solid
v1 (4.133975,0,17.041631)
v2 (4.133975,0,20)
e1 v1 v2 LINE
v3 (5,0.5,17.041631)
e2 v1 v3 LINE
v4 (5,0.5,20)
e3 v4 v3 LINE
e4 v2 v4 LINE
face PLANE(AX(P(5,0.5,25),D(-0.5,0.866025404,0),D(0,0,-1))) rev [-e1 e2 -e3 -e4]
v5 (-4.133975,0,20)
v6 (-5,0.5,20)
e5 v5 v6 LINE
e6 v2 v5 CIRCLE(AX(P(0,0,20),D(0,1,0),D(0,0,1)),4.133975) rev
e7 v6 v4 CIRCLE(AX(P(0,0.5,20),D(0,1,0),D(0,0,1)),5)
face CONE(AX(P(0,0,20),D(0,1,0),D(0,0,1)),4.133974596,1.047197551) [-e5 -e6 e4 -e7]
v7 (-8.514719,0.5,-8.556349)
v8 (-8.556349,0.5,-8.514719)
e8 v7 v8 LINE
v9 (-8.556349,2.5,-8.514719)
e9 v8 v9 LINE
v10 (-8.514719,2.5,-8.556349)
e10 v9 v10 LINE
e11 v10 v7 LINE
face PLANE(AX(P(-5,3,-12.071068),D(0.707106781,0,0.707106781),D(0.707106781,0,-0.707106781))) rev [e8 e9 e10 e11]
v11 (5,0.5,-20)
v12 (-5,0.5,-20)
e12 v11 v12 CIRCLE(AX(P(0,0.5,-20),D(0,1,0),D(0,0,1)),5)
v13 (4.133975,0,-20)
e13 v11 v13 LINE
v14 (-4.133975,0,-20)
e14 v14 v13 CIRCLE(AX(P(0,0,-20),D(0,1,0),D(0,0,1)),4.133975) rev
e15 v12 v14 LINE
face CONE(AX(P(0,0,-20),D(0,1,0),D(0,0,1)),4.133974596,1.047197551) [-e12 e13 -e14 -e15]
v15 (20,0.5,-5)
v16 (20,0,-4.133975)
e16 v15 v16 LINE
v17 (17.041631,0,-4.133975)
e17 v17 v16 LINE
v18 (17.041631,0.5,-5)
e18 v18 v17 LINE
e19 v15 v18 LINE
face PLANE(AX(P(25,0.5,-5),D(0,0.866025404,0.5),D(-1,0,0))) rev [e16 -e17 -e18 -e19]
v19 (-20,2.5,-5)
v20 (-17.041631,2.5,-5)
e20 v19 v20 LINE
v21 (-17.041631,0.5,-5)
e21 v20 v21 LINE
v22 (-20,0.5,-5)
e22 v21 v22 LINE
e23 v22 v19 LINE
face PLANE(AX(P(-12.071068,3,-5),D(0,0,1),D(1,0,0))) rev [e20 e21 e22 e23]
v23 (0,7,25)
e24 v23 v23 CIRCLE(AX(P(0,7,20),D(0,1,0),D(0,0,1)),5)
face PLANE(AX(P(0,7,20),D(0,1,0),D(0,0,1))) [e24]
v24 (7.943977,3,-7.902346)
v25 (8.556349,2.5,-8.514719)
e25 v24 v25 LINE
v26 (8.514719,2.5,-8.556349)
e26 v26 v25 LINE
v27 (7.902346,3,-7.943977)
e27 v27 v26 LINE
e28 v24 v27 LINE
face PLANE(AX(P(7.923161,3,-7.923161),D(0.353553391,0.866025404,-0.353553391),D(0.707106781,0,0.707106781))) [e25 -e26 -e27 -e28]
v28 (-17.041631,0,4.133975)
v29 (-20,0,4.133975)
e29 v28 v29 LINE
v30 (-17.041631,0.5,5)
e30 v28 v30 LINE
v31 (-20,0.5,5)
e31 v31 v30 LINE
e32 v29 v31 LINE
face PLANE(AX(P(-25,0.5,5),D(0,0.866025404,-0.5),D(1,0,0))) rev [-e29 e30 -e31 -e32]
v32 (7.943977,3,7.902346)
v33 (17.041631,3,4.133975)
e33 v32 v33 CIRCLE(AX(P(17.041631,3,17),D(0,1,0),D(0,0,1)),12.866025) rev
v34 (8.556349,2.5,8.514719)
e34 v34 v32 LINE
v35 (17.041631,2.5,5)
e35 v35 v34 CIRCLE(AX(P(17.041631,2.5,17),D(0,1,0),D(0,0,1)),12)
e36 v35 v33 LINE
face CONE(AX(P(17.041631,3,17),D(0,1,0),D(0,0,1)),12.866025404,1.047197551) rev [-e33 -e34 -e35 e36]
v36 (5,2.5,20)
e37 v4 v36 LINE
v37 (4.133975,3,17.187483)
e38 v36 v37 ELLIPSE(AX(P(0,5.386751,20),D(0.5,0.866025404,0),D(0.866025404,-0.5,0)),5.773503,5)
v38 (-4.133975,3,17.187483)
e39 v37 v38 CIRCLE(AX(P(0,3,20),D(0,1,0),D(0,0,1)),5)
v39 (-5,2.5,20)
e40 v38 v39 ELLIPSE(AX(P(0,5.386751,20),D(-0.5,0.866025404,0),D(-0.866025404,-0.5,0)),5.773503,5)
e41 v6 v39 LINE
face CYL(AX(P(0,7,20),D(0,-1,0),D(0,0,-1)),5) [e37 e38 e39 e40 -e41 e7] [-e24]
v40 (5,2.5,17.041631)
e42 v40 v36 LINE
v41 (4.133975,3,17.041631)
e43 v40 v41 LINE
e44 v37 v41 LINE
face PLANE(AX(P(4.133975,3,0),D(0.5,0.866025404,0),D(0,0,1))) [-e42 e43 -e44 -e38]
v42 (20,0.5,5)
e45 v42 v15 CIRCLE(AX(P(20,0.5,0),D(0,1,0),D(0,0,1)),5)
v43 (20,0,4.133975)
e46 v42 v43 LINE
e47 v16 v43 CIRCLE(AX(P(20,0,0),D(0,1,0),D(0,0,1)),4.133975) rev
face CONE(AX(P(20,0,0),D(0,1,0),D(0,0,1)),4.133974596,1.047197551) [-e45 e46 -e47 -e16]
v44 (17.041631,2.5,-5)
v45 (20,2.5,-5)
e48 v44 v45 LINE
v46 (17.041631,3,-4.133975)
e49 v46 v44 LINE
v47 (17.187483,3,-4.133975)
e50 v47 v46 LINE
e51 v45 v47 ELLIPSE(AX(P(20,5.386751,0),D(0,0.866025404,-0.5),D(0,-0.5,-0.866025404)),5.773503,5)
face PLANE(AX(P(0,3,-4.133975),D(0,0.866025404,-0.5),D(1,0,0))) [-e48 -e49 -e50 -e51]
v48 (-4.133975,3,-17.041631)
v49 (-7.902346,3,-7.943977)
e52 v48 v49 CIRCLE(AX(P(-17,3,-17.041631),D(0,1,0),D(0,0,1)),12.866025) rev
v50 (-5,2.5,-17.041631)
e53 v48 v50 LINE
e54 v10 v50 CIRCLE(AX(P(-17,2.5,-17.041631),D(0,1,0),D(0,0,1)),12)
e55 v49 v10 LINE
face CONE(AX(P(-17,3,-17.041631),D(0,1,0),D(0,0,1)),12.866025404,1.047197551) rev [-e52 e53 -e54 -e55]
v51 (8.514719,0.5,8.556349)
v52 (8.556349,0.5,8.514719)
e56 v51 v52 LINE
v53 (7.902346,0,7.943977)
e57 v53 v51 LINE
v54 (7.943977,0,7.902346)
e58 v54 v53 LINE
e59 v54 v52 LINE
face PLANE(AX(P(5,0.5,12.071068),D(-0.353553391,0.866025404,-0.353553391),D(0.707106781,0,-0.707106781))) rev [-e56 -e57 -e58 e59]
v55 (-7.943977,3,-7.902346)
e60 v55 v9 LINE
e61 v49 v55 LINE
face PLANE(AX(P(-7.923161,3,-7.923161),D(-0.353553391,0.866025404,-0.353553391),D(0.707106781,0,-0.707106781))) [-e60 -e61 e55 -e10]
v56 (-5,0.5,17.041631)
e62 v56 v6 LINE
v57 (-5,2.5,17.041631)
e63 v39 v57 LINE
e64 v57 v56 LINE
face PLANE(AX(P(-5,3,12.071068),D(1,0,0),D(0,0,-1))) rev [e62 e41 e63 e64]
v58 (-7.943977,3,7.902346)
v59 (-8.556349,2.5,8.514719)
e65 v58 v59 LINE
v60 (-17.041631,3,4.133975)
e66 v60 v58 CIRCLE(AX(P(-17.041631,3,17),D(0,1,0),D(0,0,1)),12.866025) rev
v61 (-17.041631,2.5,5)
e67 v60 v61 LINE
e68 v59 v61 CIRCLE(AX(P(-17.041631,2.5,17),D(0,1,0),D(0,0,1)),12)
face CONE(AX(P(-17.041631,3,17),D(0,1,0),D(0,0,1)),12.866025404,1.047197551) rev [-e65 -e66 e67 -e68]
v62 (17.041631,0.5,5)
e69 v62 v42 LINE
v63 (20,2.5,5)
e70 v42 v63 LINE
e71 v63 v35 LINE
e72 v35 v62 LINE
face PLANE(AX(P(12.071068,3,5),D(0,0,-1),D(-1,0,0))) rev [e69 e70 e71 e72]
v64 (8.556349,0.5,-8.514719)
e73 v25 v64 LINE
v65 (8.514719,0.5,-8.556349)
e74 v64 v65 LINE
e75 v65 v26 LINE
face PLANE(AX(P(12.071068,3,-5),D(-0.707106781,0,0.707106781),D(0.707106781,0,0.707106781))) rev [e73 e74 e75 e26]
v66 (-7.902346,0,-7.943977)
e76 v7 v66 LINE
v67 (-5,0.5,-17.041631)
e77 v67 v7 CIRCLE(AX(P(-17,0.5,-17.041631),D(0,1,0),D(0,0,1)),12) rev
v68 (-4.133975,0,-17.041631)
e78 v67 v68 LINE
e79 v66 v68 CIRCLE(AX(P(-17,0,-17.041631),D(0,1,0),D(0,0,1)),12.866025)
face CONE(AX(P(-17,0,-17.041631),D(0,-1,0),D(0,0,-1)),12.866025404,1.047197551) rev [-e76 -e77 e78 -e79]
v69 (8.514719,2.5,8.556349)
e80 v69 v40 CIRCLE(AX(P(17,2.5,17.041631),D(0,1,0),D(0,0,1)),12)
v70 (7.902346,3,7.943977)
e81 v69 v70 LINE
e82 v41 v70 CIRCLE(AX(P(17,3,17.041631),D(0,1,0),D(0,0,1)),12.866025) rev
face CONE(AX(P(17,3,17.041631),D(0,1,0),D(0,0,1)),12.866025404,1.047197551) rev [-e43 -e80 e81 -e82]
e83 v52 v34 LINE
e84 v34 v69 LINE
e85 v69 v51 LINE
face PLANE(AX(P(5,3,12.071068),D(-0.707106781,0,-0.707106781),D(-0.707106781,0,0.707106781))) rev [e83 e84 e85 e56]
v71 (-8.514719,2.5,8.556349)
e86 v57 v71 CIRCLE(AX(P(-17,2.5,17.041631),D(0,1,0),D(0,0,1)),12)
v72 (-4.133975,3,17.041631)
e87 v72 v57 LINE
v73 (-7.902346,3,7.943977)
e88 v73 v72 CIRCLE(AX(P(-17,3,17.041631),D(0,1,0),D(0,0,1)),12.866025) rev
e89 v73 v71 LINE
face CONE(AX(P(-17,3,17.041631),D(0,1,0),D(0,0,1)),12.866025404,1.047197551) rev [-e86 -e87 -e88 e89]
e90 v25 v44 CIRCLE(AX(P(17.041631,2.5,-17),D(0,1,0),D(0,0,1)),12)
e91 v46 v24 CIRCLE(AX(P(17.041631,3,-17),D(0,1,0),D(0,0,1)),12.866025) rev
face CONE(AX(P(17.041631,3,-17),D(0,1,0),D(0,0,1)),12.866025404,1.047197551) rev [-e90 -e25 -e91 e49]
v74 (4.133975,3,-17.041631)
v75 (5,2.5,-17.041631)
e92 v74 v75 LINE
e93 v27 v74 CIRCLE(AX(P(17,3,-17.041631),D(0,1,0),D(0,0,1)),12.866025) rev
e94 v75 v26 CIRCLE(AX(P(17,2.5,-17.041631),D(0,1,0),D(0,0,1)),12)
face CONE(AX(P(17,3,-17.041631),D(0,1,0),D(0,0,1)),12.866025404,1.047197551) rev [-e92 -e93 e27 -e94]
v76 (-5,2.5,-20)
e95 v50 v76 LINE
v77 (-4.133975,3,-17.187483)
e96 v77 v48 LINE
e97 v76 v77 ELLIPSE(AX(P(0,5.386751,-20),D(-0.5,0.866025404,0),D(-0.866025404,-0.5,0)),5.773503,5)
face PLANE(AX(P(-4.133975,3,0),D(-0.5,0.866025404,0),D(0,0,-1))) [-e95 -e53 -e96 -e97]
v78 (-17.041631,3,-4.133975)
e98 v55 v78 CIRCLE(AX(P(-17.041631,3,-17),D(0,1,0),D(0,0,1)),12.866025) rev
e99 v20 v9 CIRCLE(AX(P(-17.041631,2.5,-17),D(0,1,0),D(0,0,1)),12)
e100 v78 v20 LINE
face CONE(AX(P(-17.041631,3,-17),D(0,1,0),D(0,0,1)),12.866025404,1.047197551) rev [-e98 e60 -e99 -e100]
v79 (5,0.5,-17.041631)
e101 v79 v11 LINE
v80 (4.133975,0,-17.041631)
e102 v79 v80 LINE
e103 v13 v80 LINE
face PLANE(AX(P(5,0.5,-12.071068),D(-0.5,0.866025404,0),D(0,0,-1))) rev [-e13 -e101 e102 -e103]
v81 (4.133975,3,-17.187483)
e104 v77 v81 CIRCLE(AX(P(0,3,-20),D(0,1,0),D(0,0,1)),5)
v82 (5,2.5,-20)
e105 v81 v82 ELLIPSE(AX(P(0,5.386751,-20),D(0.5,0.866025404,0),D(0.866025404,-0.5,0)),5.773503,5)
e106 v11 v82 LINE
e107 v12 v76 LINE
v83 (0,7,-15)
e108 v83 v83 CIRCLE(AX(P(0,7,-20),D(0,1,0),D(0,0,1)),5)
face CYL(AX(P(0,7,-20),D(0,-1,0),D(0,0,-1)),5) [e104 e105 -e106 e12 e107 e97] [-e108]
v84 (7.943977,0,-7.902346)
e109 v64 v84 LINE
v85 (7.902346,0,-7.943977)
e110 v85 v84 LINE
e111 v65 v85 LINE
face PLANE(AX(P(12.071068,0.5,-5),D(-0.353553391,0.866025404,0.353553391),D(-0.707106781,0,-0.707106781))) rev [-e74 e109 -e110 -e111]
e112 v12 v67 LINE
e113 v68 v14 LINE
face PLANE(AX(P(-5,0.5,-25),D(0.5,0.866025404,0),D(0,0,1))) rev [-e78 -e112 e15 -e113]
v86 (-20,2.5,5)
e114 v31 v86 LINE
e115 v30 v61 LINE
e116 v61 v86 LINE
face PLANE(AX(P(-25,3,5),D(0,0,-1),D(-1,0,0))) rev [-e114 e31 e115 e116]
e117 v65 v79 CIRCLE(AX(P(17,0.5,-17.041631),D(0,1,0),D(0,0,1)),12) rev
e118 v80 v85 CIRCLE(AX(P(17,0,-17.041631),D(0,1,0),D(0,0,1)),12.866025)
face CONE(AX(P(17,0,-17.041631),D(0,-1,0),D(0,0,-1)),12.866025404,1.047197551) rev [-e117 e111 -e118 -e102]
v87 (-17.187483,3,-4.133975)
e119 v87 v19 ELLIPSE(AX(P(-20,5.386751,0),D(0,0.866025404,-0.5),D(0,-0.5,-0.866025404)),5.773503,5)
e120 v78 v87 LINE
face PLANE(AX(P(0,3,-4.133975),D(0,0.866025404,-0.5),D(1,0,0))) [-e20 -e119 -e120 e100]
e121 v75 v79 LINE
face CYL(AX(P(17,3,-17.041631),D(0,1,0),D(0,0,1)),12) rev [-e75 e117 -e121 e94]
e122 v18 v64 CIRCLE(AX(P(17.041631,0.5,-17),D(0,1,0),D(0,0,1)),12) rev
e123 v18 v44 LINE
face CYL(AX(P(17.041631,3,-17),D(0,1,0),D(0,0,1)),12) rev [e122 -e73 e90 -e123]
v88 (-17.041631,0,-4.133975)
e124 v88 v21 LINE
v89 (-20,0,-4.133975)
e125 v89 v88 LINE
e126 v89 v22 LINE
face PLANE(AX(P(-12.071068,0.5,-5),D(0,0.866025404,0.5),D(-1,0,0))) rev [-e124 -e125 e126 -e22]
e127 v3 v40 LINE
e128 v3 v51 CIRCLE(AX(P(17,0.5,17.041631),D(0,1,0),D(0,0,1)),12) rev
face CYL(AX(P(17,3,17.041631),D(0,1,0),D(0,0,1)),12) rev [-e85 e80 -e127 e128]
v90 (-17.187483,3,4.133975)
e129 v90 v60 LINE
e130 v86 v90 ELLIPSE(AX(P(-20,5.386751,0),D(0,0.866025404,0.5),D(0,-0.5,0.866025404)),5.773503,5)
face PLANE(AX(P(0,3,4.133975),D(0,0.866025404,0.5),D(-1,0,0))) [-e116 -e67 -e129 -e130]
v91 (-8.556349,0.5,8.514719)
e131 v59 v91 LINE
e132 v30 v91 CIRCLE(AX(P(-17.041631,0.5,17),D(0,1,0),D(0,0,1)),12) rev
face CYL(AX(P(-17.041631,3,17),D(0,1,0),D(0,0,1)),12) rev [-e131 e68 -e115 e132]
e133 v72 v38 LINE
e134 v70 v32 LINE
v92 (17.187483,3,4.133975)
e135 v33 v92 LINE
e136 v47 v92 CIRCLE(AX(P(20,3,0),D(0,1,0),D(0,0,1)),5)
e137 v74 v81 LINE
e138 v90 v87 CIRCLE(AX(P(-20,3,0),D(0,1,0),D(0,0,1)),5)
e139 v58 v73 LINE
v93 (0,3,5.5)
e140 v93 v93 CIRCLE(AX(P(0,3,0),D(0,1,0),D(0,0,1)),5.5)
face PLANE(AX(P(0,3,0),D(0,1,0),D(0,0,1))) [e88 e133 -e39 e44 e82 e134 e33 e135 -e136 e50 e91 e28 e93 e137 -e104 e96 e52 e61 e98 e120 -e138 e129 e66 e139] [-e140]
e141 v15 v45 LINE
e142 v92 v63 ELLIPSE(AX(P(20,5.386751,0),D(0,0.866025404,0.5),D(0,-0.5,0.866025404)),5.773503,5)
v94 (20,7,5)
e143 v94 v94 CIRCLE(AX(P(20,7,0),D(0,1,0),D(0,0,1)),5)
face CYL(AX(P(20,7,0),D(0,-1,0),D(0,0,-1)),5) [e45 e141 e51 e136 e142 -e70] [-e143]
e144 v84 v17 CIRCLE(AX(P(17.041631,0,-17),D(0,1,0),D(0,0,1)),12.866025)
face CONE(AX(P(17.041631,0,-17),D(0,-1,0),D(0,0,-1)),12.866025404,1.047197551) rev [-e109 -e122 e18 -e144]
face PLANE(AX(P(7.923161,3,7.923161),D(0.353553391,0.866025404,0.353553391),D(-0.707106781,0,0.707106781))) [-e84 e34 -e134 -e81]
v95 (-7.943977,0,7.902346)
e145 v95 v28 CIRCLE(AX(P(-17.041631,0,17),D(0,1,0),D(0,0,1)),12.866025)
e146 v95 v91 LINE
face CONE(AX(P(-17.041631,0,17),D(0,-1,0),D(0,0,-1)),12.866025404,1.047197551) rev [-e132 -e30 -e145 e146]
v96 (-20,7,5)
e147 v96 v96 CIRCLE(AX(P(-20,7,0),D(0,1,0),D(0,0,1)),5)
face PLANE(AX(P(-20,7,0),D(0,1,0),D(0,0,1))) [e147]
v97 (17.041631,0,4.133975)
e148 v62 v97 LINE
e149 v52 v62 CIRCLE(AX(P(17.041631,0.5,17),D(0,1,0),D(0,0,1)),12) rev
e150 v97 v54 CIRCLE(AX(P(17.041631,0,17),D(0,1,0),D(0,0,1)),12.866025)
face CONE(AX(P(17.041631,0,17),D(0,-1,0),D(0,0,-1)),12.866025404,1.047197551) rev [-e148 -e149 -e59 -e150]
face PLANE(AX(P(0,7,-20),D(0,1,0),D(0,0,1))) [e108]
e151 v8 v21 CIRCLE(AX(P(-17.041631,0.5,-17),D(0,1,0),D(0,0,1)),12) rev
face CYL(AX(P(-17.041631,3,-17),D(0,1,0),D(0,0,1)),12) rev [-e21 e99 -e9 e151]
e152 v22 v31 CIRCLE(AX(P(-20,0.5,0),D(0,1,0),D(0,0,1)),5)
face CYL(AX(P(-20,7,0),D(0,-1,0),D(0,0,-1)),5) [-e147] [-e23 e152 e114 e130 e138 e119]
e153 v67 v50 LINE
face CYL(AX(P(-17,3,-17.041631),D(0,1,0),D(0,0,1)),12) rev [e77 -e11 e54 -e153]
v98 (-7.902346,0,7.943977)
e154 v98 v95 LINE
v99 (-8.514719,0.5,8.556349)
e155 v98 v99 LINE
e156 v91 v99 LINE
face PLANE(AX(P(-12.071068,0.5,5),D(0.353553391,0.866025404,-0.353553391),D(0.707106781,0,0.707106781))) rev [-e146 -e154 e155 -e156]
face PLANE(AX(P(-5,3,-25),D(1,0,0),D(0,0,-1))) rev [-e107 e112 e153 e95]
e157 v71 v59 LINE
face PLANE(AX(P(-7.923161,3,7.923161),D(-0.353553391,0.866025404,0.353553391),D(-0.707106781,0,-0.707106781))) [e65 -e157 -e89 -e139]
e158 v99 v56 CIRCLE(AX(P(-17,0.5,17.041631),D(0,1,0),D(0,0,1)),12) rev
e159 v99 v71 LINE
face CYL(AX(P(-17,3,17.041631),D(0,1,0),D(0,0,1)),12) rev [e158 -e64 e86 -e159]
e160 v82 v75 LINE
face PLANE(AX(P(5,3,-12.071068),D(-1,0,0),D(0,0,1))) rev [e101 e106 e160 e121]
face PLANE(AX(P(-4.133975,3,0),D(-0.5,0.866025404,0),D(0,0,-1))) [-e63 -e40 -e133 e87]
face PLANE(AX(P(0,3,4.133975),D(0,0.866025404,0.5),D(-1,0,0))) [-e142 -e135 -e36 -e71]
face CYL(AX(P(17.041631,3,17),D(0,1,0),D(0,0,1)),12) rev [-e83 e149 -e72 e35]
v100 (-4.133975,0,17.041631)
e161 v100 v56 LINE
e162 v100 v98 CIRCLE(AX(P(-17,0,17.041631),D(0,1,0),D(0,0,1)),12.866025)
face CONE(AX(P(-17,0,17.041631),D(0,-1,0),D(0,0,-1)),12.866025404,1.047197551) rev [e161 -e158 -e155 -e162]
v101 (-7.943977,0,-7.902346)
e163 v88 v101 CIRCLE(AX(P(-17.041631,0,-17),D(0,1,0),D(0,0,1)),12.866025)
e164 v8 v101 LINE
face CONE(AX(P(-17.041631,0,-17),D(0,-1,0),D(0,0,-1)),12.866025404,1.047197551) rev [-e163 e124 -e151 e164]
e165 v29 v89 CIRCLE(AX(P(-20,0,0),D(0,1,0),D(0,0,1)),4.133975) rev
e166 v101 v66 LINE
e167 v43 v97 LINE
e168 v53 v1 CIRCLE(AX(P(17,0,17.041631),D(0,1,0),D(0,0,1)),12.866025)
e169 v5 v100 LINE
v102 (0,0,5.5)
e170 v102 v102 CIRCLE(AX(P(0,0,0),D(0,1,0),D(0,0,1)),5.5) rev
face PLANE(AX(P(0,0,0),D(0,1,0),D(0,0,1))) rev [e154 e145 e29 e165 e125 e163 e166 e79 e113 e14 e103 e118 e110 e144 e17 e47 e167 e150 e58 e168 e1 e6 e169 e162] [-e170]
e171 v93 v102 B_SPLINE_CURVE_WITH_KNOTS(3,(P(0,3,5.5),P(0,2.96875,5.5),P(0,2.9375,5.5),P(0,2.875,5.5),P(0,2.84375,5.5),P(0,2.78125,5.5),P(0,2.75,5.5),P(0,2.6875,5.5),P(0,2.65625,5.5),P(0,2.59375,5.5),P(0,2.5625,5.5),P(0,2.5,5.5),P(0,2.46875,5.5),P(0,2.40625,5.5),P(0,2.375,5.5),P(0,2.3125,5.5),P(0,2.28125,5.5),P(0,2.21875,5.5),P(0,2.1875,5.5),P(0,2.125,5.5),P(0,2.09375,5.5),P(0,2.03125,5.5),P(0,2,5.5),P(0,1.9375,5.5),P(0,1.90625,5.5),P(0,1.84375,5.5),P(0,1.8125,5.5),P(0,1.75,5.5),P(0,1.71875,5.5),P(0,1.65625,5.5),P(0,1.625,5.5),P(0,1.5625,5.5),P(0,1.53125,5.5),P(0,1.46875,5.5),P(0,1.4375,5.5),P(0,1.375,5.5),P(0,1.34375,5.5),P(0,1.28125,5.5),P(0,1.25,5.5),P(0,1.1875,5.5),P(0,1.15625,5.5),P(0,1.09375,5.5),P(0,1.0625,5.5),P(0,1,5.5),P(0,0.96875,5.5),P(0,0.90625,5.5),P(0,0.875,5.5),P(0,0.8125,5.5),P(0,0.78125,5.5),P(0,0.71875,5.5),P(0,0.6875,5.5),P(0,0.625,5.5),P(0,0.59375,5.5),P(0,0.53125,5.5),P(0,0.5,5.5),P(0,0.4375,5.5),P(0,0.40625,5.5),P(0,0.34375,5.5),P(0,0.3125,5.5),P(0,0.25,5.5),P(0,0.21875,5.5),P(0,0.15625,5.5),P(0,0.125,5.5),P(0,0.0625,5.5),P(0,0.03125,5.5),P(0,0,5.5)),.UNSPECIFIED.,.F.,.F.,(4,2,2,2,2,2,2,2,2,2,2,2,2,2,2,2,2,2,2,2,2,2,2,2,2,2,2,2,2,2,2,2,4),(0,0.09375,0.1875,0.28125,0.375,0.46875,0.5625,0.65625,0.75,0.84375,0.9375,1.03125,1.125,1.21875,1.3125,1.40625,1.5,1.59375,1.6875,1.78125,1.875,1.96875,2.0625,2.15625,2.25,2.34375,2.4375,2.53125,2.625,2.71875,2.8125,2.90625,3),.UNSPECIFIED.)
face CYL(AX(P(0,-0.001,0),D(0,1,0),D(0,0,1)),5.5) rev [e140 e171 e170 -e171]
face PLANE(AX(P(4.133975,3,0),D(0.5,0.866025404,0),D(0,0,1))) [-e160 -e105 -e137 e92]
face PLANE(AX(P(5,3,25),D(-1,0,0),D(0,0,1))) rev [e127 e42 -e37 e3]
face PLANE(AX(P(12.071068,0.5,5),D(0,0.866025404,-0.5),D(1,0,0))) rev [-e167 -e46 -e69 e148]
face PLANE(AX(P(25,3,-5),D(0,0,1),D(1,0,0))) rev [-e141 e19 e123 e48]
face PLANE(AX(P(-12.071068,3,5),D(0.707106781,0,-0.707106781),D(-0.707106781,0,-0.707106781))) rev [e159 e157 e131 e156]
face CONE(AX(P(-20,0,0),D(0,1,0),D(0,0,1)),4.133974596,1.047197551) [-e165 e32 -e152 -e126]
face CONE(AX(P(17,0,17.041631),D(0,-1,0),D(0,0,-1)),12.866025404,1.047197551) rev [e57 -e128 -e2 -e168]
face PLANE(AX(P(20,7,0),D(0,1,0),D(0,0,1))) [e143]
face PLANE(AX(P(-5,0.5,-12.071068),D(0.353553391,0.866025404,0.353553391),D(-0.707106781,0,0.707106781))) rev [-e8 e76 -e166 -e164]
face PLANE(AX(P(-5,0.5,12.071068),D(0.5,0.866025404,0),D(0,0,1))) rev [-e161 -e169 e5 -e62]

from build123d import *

# Parameters (mm, degrees)
BOSS_EXTRUDE2_DEPTH = 3
SKETCH3_R           = 5
BOSS_EXTRUDE3_DEPTH = 4
FILLET2_R           = 12
CUT_EXTRUDE1_REACH  = 37.581
SKETCH4_R           = 5.5
CHAMFER1_SIZE       = 0.866025404
CHAMFER1_SIZE_2     = 0.5


with BuildPart() as part:
    # Sketch2 → Boss-Extrude2 (new body)
    with BuildSketch(Plane(origin=(0, 0, 0), x_dir=(1, 0, 0), z_dir=(0, 1, 0))):
        Polygon((-5, 25), (-5, 12.071067812), (-12.071067812, 5), (-25, 5), (-25, -5), (-12.071067812, -5), (-5, -12.071067812), (-5, -25), (5, -25), (5, -12.071067812), (12.071067812, -5), (25, -5), (25, 5), (12.071067812, 5), (5, 12.071067812), (5, 25), align=None)
    extrude(amount=BOSS_EXTRUDE2_DEPTH)

    # Sketch3 → Boss-Extrude3 (add)
    with BuildSketch(Plane(origin=(0, 3, 0), x_dir=(1, 0, 0), z_dir=(0, 1, 0))):
        with Locations(Location((-20, 0, 0), (0, 0, 270))):
            Circle(SKETCH3_R)
        with Locations(Location((0, 20, 0), (0, 0, 90))):
            Circle(SKETCH3_R)
        with Locations(Location((20, 0, 0), (0, 0, 270))):
            Circle(SKETCH3_R)
        with Locations(Location((0, -20, 0), (0, 0, 270))):
            Circle(SKETCH3_R)
    extrude(amount=BOSS_EXTRUDE3_DEPTH)

    # Fillet2
    fillet2_edges = [part.edges().sort_by_distance(p)[0] for p in [
        (5, 1.5, -12.071067812),
        (12.071067812, 1.5, -5),
        (12.071067812, 1.5, 5),
        (5, 1.5, 12.071067812),
        (-5, 1.5, 12.071067812),
        (-12.071067812, 1.5, 5),
        (-12.071067812, 1.5, -5),
        (-5, 1.5, -12.071067812),
    ]]
    fillet(fillet2_edges, radius=FILLET2_R)

    # Sketch4 → Cut-Extrude1 (cut, up to next)
    with BuildSketch(Plane(origin=(0, 3, 0), x_dir=(1, 0, 0), z_dir=(0, 1, 0)), mode=Mode.PRIVATE) as cut_extrude1_sk1:
        with BuildLine():
            ThreePointArc((-25, 0), (-23.535533906, -3.535533906), (-20, -5))
            Line((-20, -5), (-25, -5))
            Line((-25, -5), (-25, 0))
        make_face()
    cut_extrude1_tool1 = extrude(cut_extrude1_sk1.sketch, amount=-CUT_EXTRUDE1_REACH, mode=Mode.PRIVATE) & part.part
    # Sketch4 → Cut-Extrude1 (cut, up to next)
    with BuildSketch(Plane(origin=(0, 3, 0), x_dir=(1, 0, 0), z_dir=(0, 1, 0)), mode=Mode.PRIVATE) as cut_extrude1_sk2:
        with BuildLine():
            ThreePointArc((-20, 5), (-23.535533906, 3.535533906), (-25, 0))
            Line((-25, 0), (-25, 5))
            Line((-25, 5), (-20, 5))
        make_face()
    cut_extrude1_tool2 = extrude(cut_extrude1_sk2.sketch, amount=-CUT_EXTRUDE1_REACH, mode=Mode.PRIVATE) & part.part
    # Sketch4 → Cut-Extrude1 (cut, up to next)
    with BuildSketch(Plane(origin=(0, 3, 0), x_dir=(1, 0, 0), z_dir=(0, 1, 0)), mode=Mode.PRIVATE) as cut_extrude1_sk3:
        with BuildLine():
            ThreePointArc((0, 25), (-3.535533906, 23.535533906), (-5, 20))
            Line((-5, 20), (-5, 25))
            Line((-5, 25), (0, 25))
        make_face()
    cut_extrude1_tool3 = extrude(cut_extrude1_sk3.sketch, amount=-CUT_EXTRUDE1_REACH, mode=Mode.PRIVATE) & part.part
    # Sketch4 → Cut-Extrude1 (cut, up to next)
    with BuildSketch(Plane(origin=(0, 3, 0), x_dir=(1, 0, 0), z_dir=(0, 1, 0)), mode=Mode.PRIVATE) as cut_extrude1_sk4:
        with BuildLine():
            ThreePointArc((5, 20), (3.535533906, 23.535533906), (0, 25))
            Line((0, 25), (5, 25))
            Line((5, 25), (5, 20))
        make_face()
    cut_extrude1_tool4 = extrude(cut_extrude1_sk4.sketch, amount=-CUT_EXTRUDE1_REACH, mode=Mode.PRIVATE) & part.part
    # Sketch4 → Cut-Extrude1 (cut, up to next)
    with BuildSketch(Plane(origin=(0, 3, 0), x_dir=(1, 0, 0), z_dir=(0, 1, 0)), mode=Mode.PRIVATE) as cut_extrude1_sk5:
        with BuildLine():
            ThreePointArc((25, 0), (23.535533906, 3.535533906), (20, 5))
            Line((20, 5), (25, 5))
            Line((25, 5), (25, 0))
        make_face()
    cut_extrude1_tool5 = extrude(cut_extrude1_sk5.sketch, amount=-CUT_EXTRUDE1_REACH, mode=Mode.PRIVATE) & part.part
    # Sketch4 → Cut-Extrude1 (cut, up to next)
    with BuildSketch(Plane(origin=(0, 3, 0), x_dir=(1, 0, 0), z_dir=(0, 1, 0)), mode=Mode.PRIVATE) as cut_extrude1_sk6:
        with BuildLine():
            ThreePointArc((20, -5), (23.535533906, -3.535533906), (25, 0))
            Line((25, 0), (25, -5))
            Line((25, -5), (20, -5))
        make_face()
    cut_extrude1_tool6 = extrude(cut_extrude1_sk6.sketch, amount=-CUT_EXTRUDE1_REACH, mode=Mode.PRIVATE) & part.part
    # Sketch4 → Cut-Extrude1 (cut, up to next)
    with BuildSketch(Plane(origin=(0, 3, 0), x_dir=(1, 0, 0), z_dir=(0, 1, 0)), mode=Mode.PRIVATE) as cut_extrude1_sk7:
        with BuildLine():
            ThreePointArc((0, -25), (3.535533906, -23.535533906), (5, -20))
            Line((5, -20), (5, -25))
            Line((5, -25), (0, -25))
        make_face()
    cut_extrude1_tool7 = extrude(cut_extrude1_sk7.sketch, amount=-CUT_EXTRUDE1_REACH, mode=Mode.PRIVATE) & part.part
    # Sketch4 → Cut-Extrude1 (cut, up to next)
    with BuildSketch(Plane(origin=(0, 3, 0), x_dir=(1, 0, 0), z_dir=(0, 1, 0)), mode=Mode.PRIVATE) as cut_extrude1_sk8:
        with BuildLine():
            ThreePointArc((-5, -20), (-3.535533906, -23.535533906), (0, -25))
            Line((0, -25), (-5, -25))
            Line((-5, -25), (-5, -20))
        make_face()
    cut_extrude1_tool8 = extrude(cut_extrude1_sk8.sketch, amount=-CUT_EXTRUDE1_REACH, mode=Mode.PRIVATE) & part.part
    # Sketch4 → Cut-Extrude1 (cut, up to next)
    with BuildSketch(Plane(origin=(0, 3, 0), x_dir=(1, 0, 0), z_dir=(0, 1, 0)), mode=Mode.PRIVATE) as cut_extrude1_sk9:
        with Locations(Location((0, 0, 0), (0, 0, 270))):
            Circle(SKETCH4_R)
    cut_extrude1_tool9 = extrude(cut_extrude1_sk9.sketch, amount=-CUT_EXTRUDE1_REACH, mode=Mode.PRIVATE) & part.part
    add(cut_extrude1_tool1.solids().sort_by_distance((-23.88316, 3, 3.88316))[0], mode=Mode.SUBTRACT)
    add(cut_extrude1_tool2.solids().sort_by_distance((-23.88316, 3, -3.88316))[0], mode=Mode.SUBTRACT)
    add(cut_extrude1_tool3.solids().sort_by_distance((-3.88316, 3, -23.88316))[0], mode=Mode.SUBTRACT)
    add(cut_extrude1_tool4.solids().sort_by_distance((3.88316, 3, -23.88316))[0], mode=Mode.SUBTRACT)
    add(cut_extrude1_tool5.solids().sort_by_distance((23.88316, 3, -3.88316))[0], mode=Mode.SUBTRACT)
    add(cut_extrude1_tool6.solids().sort_by_distance((23.88316, 3, 3.88316))[0], mode=Mode.SUBTRACT)
    add(cut_extrude1_tool7.solids().sort_by_distance((3.88316, 3, 23.88316))[0], mode=Mode.SUBTRACT)
    add(cut_extrude1_tool8.solids().sort_by_distance((-3.88316, 3, 23.88316))[0], mode=Mode.SUBTRACT)
    add(cut_extrude1_tool9.solids().sort_by_distance((0, 3, 0))[0], mode=Mode.SUBTRACT)

    # Chamfer1
    # the kernel refuses this chamfer: 0.866025404, 0.5 mm, written as the material it takes off along each edge
    with BuildSketch(Plane(origin=(17.04163056, 3, 17), x_dir=(-0.7071067811865476, 0, -0.7071067811865475), z_dir=(-0.7071067811865475, 0, 0.7071067811865476))) as chamfer1_piece_1:
        Polygon((12 + CHAMFER1_SIZE, 0), (12, CHAMFER1_SIZE_2), (12, 0), align=None)
    revolve(axis=Axis((17.04163056, 3, 17), (0, -1, 0)), revolution_arc=45, mode=Mode.SUBTRACT)
    with BuildSketch(Plane(origin=(17.04163056, 0, 17), x_dir=(-0.7071067811865476, 0, -0.7071067811865475), z_dir=(-0.7071067811865475, 0, 0.7071067811865476))) as chamfer1_piece_2:
        Polygon((12 + CHAMFER1_SIZE, 0), (12, -CHAMFER1_SIZE_2), (12, 0), align=None)
    revolve(axis=Axis((17.04163056, 0, 17), (0, -1, 0)), revolution_arc=45, mode=Mode.SUBTRACT)
    with BuildSketch(Plane(origin=(17, 0, 17.04163056), x_dir=(-1, 0, 0), z_dir=(0, 0, 1))) as chamfer1_piece_3:
        Polygon((12 + CHAMFER1_SIZE, 0), (12, -CHAMFER1_SIZE_2), (12, 0), align=None)
    revolve(axis=Axis((17, 0, 17.04163056), (0, -1, 0)), revolution_arc=45, mode=Mode.SUBTRACT)
    with BuildSketch(Plane(origin=(17, 3, 17.04163056), x_dir=(-1, 0, 0), z_dir=(0, 0, 1))) as chamfer1_piece_4:
        Polygon((12 + CHAMFER1_SIZE, 0), (12, CHAMFER1_SIZE_2), (12, 0), align=None)
    revolve(axis=Axis((17, 3, 17.04163056), (0, -1, 0)), revolution_arc=45, mode=Mode.SUBTRACT)
    with BuildSketch(Plane(origin=(5, 0, 20), x_dir=(-0.9998132206222079, -0.019326765612700636, 0), z_dir=(0, 0, -1)), Plane(origin=(-20, 0, 5), x_dir=(0, -0.019326765612700636, -0.9998132206222079), z_dir=(1, 0, 0)), Plane(origin=(20, 0, -5), x_dir=(0, -0.019326765612700636, 0.9998132206222079), z_dir=(-1, 0, 0)), Plane(origin=(-5, 0, 17.04163056), x_dir=(0.9998132206222079, -0.019326765612700636, 0), z_dir=(0, 0, 1)), Plane(origin=(-17.04163056, 0, -5), x_dir=(0, -0.019326765612700636, 0.9998132206222079), z_dir=(-1, 0, 0)), Plane(origin=(5, 0, -17.04163056), x_dir=(-0.9998132206222079, -0.019326765612700636, 0), z_dir=(0, 0, -1)), Plane(origin=(17.04163056, 0, 5), x_dir=(0, -0.019326765612700636, -0.9998132206222079), z_dir=(1, 0, 0))) as chamfer1_piece_5:
        Polygon((CHAMFER1_SIZE * 0.999813220373, CHAMFER1_SIZE * 0.0193267656079), (-CHAMFER1_SIZE_2 * 0.0193267656127, CHAMFER1_SIZE_2 * 0.999813220622), (0, 0), align=None)
    extrude(amount=2.95836944, mode=Mode.SUBTRACT)
    with BuildSketch(Plane(origin=(5, 3, 22.240481985), x_dir=(-0.9998132206222079, 0.019326765612700702, 0), z_dir=(0, 0, -1))) as chamfer1_piece_6_section:
        Polygon((CHAMFER1_SIZE * 0.999813220373, -CHAMFER1_SIZE * 0.0193267656079), (-CHAMFER1_SIZE_2 * 0.0193267656127, -CHAMFER1_SIZE_2 * 0.999813220622), (0, 0), align=None)
    chamfer1_piece_6 = extrude(amount=5.198851425, mode=Mode.PRIVATE)
    chamfer1_piece_6 = chamfer1_piece_6 - Plane(origin=(0, 2.808146468, 20), x_dir=(0, 0, 1), z_dir=(0, 1, 0)) * Cylinder(5, 14, mode=Mode.PRIVATE)
    add(chamfer1_piece_6, mode=Mode.SUBTRACT)
    with BuildSketch(Plane(origin=(-5, 0, -20), x_dir=(-0.057893862402671484, 0.9983227437537926, 0), z_dir=(0, 0, 1))) as chamfer1_piece_7:
        Polygon((CHAMFER1_SIZE_2 * 0.998322743754, -CHAMFER1_SIZE_2 * 0.0578938624027), (-CHAMFER1_SIZE * 0.0578938623883, -CHAMFER1_SIZE * 0.998322743505), (0, 0), align=None)
    extrude(amount=2.95836944, mode=Mode.SUBTRACT)
    with BuildSketch(Plane(origin=(-5, 3, -22.240481983), x_dir=(-0.05789386240267147, -0.9983227437537926, 0), z_dir=(0, 0, 1))) as chamfer1_piece_8_section:
        Polygon((CHAMFER1_SIZE_2 * 0.998322743754, CHAMFER1_SIZE_2 * 0.0578938624027), (-CHAMFER1_SIZE * 0.0578938623883, CHAMFER1_SIZE * 0.998322743505), (0, 0), align=None)
    chamfer1_piece_8 = extrude(amount=5.198851422, mode=Mode.PRIVATE)
    chamfer1_piece_8 = chamfer1_piece_8 - Plane(origin=(0, 2.808146468, -20), x_dir=(0, 0, -1), z_dir=(0, 1, 0)) * Cylinder(5, 14, mode=Mode.PRIVATE)
    add(chamfer1_piece_8, mode=Mode.SUBTRACT)
    with BuildSketch(Plane(origin=(0, 0, 20), x_dir=(-1, 0, 0), z_dir=(0, 0, -1))) as chamfer1_piece_9:
        Polygon((5 - CHAMFER1_SIZE, 0), (5, CHAMFER1_SIZE_2), (5, 0), align=None)
    revolve(axis=Axis((0, 0, 20), (0, 1, 0)), revolution_arc=90, mode=Mode.SUBTRACT)
    with BuildSketch(Plane(origin=(20, 0, 0), x_dir=(0, 0, 1), z_dir=(-1, 0, 0))) as chamfer1_piece_10:
        Polygon((5 - CHAMFER1_SIZE, 0), (5, CHAMFER1_SIZE_2), (5, 0), align=None)
    revolve(axis=Axis((20, 0, 0), (0, 1, 0)), revolution_arc=90, mode=Mode.SUBTRACT)
    with BuildSketch(Plane(origin=(0, 0, -20), x_dir=(1, 0, 0), z_dir=(0, 0, 1))) as chamfer1_piece_11:
        Polygon((5 - CHAMFER1_SIZE, 0), (5, CHAMFER1_SIZE_2), (5, 0), align=None)
    revolve(axis=Axis((0, 0, -20), (0, 1, 0)), revolution_arc=90, mode=Mode.SUBTRACT)
    with BuildSketch(Plane(origin=(-20, 0, 0), x_dir=(0, 0, -1), z_dir=(1, 0, 0))) as chamfer1_piece_12:
        Polygon((5 - CHAMFER1_SIZE, 0), (5, CHAMFER1_SIZE_2), (5, 0), align=None)
    revolve(axis=Axis((-20, 0, 0), (0, 1, 0)), revolution_arc=90, mode=Mode.SUBTRACT)
    with BuildSketch(Plane(origin=(-22.240481985, 3, 5), x_dir=(0, 0.019326765612700702, -0.9998132206222079), z_dir=(1, 0, 0))) as chamfer1_piece_13_section:
        Polygon((CHAMFER1_SIZE * 0.999813220373, -CHAMFER1_SIZE * 0.0193267656079), (-CHAMFER1_SIZE_2 * 0.0193267656127, -CHAMFER1_SIZE_2 * 0.999813220622), (0, 0), align=None)
    chamfer1_piece_13 = extrude(amount=5.198851425, mode=Mode.PRIVATE)
    chamfer1_piece_13 = chamfer1_piece_13 - Plane(origin=(-20, 2.808146468, 0), x_dir=(-1, 0, 0), z_dir=(0, 1, 0)) * Cylinder(5, 14, mode=Mode.PRIVATE)
    add(chamfer1_piece_13, mode=Mode.SUBTRACT)
    with BuildSketch(Plane(origin=(22.240481985, 3, -5), x_dir=(0, 0.019326765612700702, 0.9998132206222079), z_dir=(-1, 0, 0))) as chamfer1_piece_14_section:
        Polygon((CHAMFER1_SIZE * 0.999813220373, -CHAMFER1_SIZE * 0.0193267656079), (-CHAMFER1_SIZE_2 * 0.0193267656127, -CHAMFER1_SIZE_2 * 0.999813220622), (0, 0), align=None)
    chamfer1_piece_14 = extrude(amount=5.198851425, mode=Mode.PRIVATE)
    chamfer1_piece_14 = chamfer1_piece_14 - Plane(origin=(20, 2.808146468, 0), x_dir=(1, 0, 0), z_dir=(0, 1, 0)) * Cylinder(5, 14, mode=Mode.PRIVATE)
    add(chamfer1_piece_14, mode=Mode.SUBTRACT)
    with BuildSketch(Plane(origin=(-8.556349186, 0, 8.514718626), x_dir=(0.7069747082219248, -0.01932676561270064, -0.7069747082219251), z_dir=(0.7071067811865477, 0, 0.7071067811865475)), Plane(origin=(-8.514718626, 0, -8.556349186), x_dir=(0.706974708221925, -0.01932676561270064, 0.706974708221925), z_dir=(-0.7071067811865475, 0, 0.7071067811865476)), Plane(origin=(8.556349186, 0, -8.514718626), x_dir=(-0.706974708221925, -0.01932676561270064, 0.706974708221925), z_dir=(-0.7071067811865476, 0, -0.7071067811865476)), Plane(origin=(8.514718626, 0, 8.556349186), x_dir=(-0.7069747082219248, -0.01932676561270064, -0.7069747082219251), z_dir=(0.7071067811865477, 0, -0.7071067811865475))) as chamfer1_piece_15:
        Polygon((CHAMFER1_SIZE * 0.999813220373, CHAMFER1_SIZE * 0.0193267656079), (-CHAMFER1_SIZE_2 * 0.0193267656127, CHAMFER1_SIZE_2 * 0.999813220622), (0, 0), align=None)
    extrude(amount=0.058874503, mode=Mode.SUBTRACT)
    with BuildSketch(Plane(origin=(-8.556349186, 3, 8.514718626), x_dir=(0.7069747082219248, 0.019326765612700702, -0.7069747082219251), z_dir=(0.7071067811865477, 0, 0.7071067811865475)), Plane(origin=(-8.514718626, 3, -8.556349186), x_dir=(0.706974708221925, 0.019326765612700702, 0.706974708221925), z_dir=(-0.7071067811865475, 0, 0.7071067811865476)), Plane(origin=(8.556349186, 3, -8.514718626), x_dir=(-0.706974708221925, 0.019326765612700702, 0.706974708221925), z_dir=(-0.7071067811865476, 0, -0.7071067811865476)), Plane(origin=(8.514718626, 3, 8.556349186), x_dir=(-0.7069747082219248, 0.019326765612700702, -0.7069747082219251), z_dir=(0.7071067811865477, 0, -0.7071067811865475))) as chamfer1_piece_16:
        Polygon((CHAMFER1_SIZE * 0.999813220373, -CHAMFER1_SIZE * 0.0193267656079), (-CHAMFER1_SIZE_2 * 0.0193267656127, -CHAMFER1_SIZE_2 * 0.999813220622), (0, 0), align=None)
    extrude(amount=0.058874503, mode=Mode.SUBTRACT)
    with BuildSketch(Plane(origin=(-5, 3, 17.04163056), x_dir=(0.9998132206222079, 0.019326765612700702, 0), z_dir=(0, 0, 1))) as chamfer1_piece_17_section:
        Polygon((CHAMFER1_SIZE * 0.999813220373, -CHAMFER1_SIZE * 0.0193267656079), (-CHAMFER1_SIZE_2 * 0.0193267656127, -CHAMFER1_SIZE_2 * 0.999813220622), (0, 0), align=None)
    chamfer1_piece_17 = extrude(amount=5.198851425, mode=Mode.PRIVATE)
    chamfer1_piece_17 = chamfer1_piece_17 - Plane(origin=(0, 2.808146468, 20), x_dir=(-1, 0, 0), z_dir=(0, 1, 0)) * Cylinder(5, 14, mode=Mode.PRIVATE)
    add(chamfer1_piece_17, mode=Mode.SUBTRACT)
    with BuildSketch(Plane(origin=(-17.04163056, 3, -5), x_dir=(0, 0.019326765612700702, 0.9998132206222079), z_dir=(-1, 0, 0))) as chamfer1_piece_18_section:
        Polygon((CHAMFER1_SIZE * 0.999813220373, -CHAMFER1_SIZE * 0.0193267656079), (-CHAMFER1_SIZE_2 * 0.0193267656127, -CHAMFER1_SIZE_2 * 0.999813220622), (0, 0), align=None)
    chamfer1_piece_18 = extrude(amount=5.198851425, mode=Mode.PRIVATE)
    chamfer1_piece_18 = chamfer1_piece_18 - Plane(origin=(-20, 2.808146468, 0), x_dir=(0, 0, -1), z_dir=(0, 1, 0)) * Cylinder(5, 14, mode=Mode.PRIVATE)
    add(chamfer1_piece_18, mode=Mode.SUBTRACT)
    with BuildSketch(Plane(origin=(5, 3, -17.04163056), x_dir=(-0.9998132206222079, 0.019326765612700702, 0), z_dir=(0, 0, -1))) as chamfer1_piece_19_section:
        Polygon((CHAMFER1_SIZE * 0.999813220373, -CHAMFER1_SIZE * 0.0193267656079), (-CHAMFER1_SIZE_2 * 0.0193267656127, -CHAMFER1_SIZE_2 * 0.999813220622), (0, 0), align=None)
    chamfer1_piece_19 = extrude(amount=5.198851425, mode=Mode.PRIVATE)
    chamfer1_piece_19 = chamfer1_piece_19 - Plane(origin=(0, 2.808146468, -20), x_dir=(1, 0, 0), z_dir=(0, 1, 0)) * Cylinder(5, 14, mode=Mode.PRIVATE)
    add(chamfer1_piece_19, mode=Mode.SUBTRACT)
    with BuildSketch(Plane(origin=(17.04163056, 3, 5), x_dir=(0, 0.019326765612700702, -0.9998132206222079), z_dir=(1, 0, 0))) as chamfer1_piece_20_section:
        Polygon((CHAMFER1_SIZE * 0.999813220373, -CHAMFER1_SIZE * 0.0193267656079), (-CHAMFER1_SIZE_2 * 0.0193267656127, -CHAMFER1_SIZE_2 * 0.999813220622), (0, 0), align=None)
    chamfer1_piece_20 = extrude(amount=5.198851425, mode=Mode.PRIVATE)
    chamfer1_piece_20 = chamfer1_piece_20 - Plane(origin=(20, 2.808146468, 0), x_dir=(0, 0, 1), z_dir=(0, 1, 0)) * Cylinder(5, 14, mode=Mode.PRIVATE)
    add(chamfer1_piece_20, mode=Mode.SUBTRACT)
    with BuildSketch(Plane(origin=(-17.04163056, 0, 17), x_dir=(0, 0, -1), z_dir=(-1, 0, 0))) as chamfer1_piece_21:
        Polygon((12 + CHAMFER1_SIZE, 0), (12, -CHAMFER1_SIZE_2), (12, 0), align=None)
    revolve(axis=Axis((-17.04163056, 0, 17), (0, -1, 0)), revolution_arc=45, mode=Mode.SUBTRACT)
    with BuildSketch(Plane(origin=(-17.04163056, 3, 17), x_dir=(0, 0, -1), z_dir=(-1, 0, 0))) as chamfer1_piece_22:
        Polygon((12 + CHAMFER1_SIZE, 0), (12, CHAMFER1_SIZE_2), (12, 0), align=None)
    revolve(axis=Axis((-17.04163056, 3, 17), (0, -1, 0)), revolution_arc=45, mode=Mode.SUBTRACT)
    with BuildSketch(Plane(origin=(-17, 0, 17.04163056), x_dir=(0.7071067811865475, 0, -0.7071067811865476), z_dir=(-0.7071067811865476, 0, -0.7071067811865475))) as chamfer1_piece_23:
        Polygon((12 + CHAMFER1_SIZE, 0), (12, -CHAMFER1_SIZE_2), (12, 0), align=None)
    revolve(axis=Axis((-17, 0, 17.04163056), (0, -1, 0)), revolution_arc=45, mode=Mode.SUBTRACT)
    with BuildSketch(Plane(origin=(-17, 3, 17.04163056), x_dir=(0.7071067811865475, 0, -0.7071067811865476), z_dir=(-0.7071067811865476, 0, -0.7071067811865475))) as chamfer1_piece_24:
        Polygon((12 + CHAMFER1_SIZE, 0), (12, CHAMFER1_SIZE_2), (12, 0), align=None)
    revolve(axis=Axis((-17, 3, 17.04163056), (0, -1, 0)), revolution_arc=45, mode=Mode.SUBTRACT)
    with BuildSketch(Plane(origin=(-17.04163056, 0, -17), x_dir=(0.7071067811865477, 0, 0.7071067811865475), z_dir=(0.7071067811865475, 0, -0.7071067811865477))) as chamfer1_piece_25:
        Polygon((12 + CHAMFER1_SIZE, 0), (12, -CHAMFER1_SIZE_2), (12, 0), align=None)
    revolve(axis=Axis((-17.04163056, 0, -17), (0, -1, 0)), revolution_arc=45, mode=Mode.SUBTRACT)
    with BuildSketch(Plane(origin=(-17.04163056, 3, -17), x_dir=(0.7071067811865477, 0, 0.7071067811865475), z_dir=(0.7071067811865475, 0, -0.7071067811865477))) as chamfer1_piece_26:
        Polygon((12 + CHAMFER1_SIZE, 0), (12, CHAMFER1_SIZE_2), (12, 0), align=None)
    revolve(axis=Axis((-17.04163056, 3, -17), (0, -1, 0)), revolution_arc=45, mode=Mode.SUBTRACT)
    with BuildSketch(Plane(origin=(-17, 0, -17.04163056), x_dir=(1, 0, 0), z_dir=(0, 0, -1))) as chamfer1_piece_27:
        Polygon((12 + CHAMFER1_SIZE, 0), (12, -CHAMFER1_SIZE_2), (12, 0), align=None)
    revolve(axis=Axis((-17, 0, -17.04163056), (0, -1, 0)), revolution_arc=45, mode=Mode.SUBTRACT)
    with BuildSketch(Plane(origin=(-17, 3, -17.04163056), x_dir=(1, 0, 0), z_dir=(0, 0, -1))) as chamfer1_piece_28:
        Polygon((12, CHAMFER1_SIZE_2), (12 + CHAMFER1_SIZE, 0), (12, 0), align=None)
    revolve(axis=Axis((-17, 3, -17.04163056), (0, -1, 0)), revolution_arc=45, mode=Mode.SUBTRACT)
    with BuildSketch(Plane(origin=(17, 0, -17.04163056), x_dir=(-1, 0, 0), z_dir=(0, 0, -1))) as chamfer1_piece_29:
        Polygon((12 + CHAMFER1_SIZE, 0), (12, CHAMFER1_SIZE_2), (12, 0), align=None)
    revolve(axis=Axis((17, 0, -17.04163056), (0, 1, 0)), revolution_arc=45, mode=Mode.SUBTRACT)
    with BuildSketch(Plane(origin=(17, 3, -17.04163056), x_dir=(-1, 0, 0), z_dir=(0, 0, -1))) as chamfer1_piece_30:
        Polygon((12 + CHAMFER1_SIZE, 0), (12, -CHAMFER1_SIZE_2), (12, 0), align=None)
    revolve(axis=Axis((17, 3, -17.04163056), (0, 1, 0)), revolution_arc=45, mode=Mode.SUBTRACT)
    with BuildSketch(Plane(origin=(17.04163056, 0, -17), x_dir=(0, 0, 1), z_dir=(1, 0, 0))) as chamfer1_piece_31:
        Polygon((12 + CHAMFER1_SIZE, 0), (12, -CHAMFER1_SIZE_2), (12, 0), align=None)
    revolve(axis=Axis((17.04163056, 0, -17), (0, -1, 0)), revolution_arc=45, mode=Mode.SUBTRACT)
    with BuildSketch(Plane(origin=(17.04163056, 3, -17), x_dir=(0, 0, 1), z_dir=(1, 0, 0))) as chamfer1_piece_32:
        Polygon((12 + CHAMFER1_SIZE, 0), (12, CHAMFER1_SIZE_2), (12, 0), align=None)
    revolve(axis=Axis((17.04163056, 3, -17), (0, -1, 0)), revolution_arc=45, mode=Mode.SUBTRACT)
    with BuildSketch(Plane(origin=(20, 0, 0), x_dir=(1, 0, 0), z_dir=(0, 0, 1))) as chamfer1_piece_33:
        Polygon((5 - CHAMFER1_SIZE, 0), (5, CHAMFER1_SIZE_2), (5, 0), align=None)
    revolve(axis=Axis((20, 0, 0), (0, 1, 0)), revolution_arc=90, mode=Mode.SUBTRACT)
    with BuildSketch(Plane(origin=(-20, 0, 0), x_dir=(-1, 0, 0), z_dir=(0, 0, -1))) as chamfer1_piece_34:
        Polygon((5 - CHAMFER1_SIZE, 0), (5, CHAMFER1_SIZE_2), (5, 0), align=None)
    revolve(axis=Axis((-20, 0, 0), (0, 1, 0)), revolution_arc=90, mode=Mode.SUBTRACT)
    with BuildSketch(Plane(origin=(0, 0, -20), x_dir=(0, 0, -1), z_dir=(1, 0, 0))) as chamfer1_piece_35:
        Polygon((5 - CHAMFER1_SIZE, 0), (5, CHAMFER1_SIZE_2), (5, 0), align=None)
    revolve(axis=Axis((0, 0, -20), (0, 1, 0)), revolution_arc=90, mode=Mode.SUBTRACT)
    with BuildSketch(Plane(origin=(0, 0, 20), x_dir=(0, 0, 1), z_dir=(-1, 0, 0))) as chamfer1_piece_36:
        Polygon((5 - CHAMFER1_SIZE, 0), (5, CHAMFER1_SIZE_2), (5, 0), align=None)
    revolve(axis=Axis((0, 0, 20), (0, 1, 0)), revolution_arc=90, mode=Mode.SUBTRACT)


solid = part.part
